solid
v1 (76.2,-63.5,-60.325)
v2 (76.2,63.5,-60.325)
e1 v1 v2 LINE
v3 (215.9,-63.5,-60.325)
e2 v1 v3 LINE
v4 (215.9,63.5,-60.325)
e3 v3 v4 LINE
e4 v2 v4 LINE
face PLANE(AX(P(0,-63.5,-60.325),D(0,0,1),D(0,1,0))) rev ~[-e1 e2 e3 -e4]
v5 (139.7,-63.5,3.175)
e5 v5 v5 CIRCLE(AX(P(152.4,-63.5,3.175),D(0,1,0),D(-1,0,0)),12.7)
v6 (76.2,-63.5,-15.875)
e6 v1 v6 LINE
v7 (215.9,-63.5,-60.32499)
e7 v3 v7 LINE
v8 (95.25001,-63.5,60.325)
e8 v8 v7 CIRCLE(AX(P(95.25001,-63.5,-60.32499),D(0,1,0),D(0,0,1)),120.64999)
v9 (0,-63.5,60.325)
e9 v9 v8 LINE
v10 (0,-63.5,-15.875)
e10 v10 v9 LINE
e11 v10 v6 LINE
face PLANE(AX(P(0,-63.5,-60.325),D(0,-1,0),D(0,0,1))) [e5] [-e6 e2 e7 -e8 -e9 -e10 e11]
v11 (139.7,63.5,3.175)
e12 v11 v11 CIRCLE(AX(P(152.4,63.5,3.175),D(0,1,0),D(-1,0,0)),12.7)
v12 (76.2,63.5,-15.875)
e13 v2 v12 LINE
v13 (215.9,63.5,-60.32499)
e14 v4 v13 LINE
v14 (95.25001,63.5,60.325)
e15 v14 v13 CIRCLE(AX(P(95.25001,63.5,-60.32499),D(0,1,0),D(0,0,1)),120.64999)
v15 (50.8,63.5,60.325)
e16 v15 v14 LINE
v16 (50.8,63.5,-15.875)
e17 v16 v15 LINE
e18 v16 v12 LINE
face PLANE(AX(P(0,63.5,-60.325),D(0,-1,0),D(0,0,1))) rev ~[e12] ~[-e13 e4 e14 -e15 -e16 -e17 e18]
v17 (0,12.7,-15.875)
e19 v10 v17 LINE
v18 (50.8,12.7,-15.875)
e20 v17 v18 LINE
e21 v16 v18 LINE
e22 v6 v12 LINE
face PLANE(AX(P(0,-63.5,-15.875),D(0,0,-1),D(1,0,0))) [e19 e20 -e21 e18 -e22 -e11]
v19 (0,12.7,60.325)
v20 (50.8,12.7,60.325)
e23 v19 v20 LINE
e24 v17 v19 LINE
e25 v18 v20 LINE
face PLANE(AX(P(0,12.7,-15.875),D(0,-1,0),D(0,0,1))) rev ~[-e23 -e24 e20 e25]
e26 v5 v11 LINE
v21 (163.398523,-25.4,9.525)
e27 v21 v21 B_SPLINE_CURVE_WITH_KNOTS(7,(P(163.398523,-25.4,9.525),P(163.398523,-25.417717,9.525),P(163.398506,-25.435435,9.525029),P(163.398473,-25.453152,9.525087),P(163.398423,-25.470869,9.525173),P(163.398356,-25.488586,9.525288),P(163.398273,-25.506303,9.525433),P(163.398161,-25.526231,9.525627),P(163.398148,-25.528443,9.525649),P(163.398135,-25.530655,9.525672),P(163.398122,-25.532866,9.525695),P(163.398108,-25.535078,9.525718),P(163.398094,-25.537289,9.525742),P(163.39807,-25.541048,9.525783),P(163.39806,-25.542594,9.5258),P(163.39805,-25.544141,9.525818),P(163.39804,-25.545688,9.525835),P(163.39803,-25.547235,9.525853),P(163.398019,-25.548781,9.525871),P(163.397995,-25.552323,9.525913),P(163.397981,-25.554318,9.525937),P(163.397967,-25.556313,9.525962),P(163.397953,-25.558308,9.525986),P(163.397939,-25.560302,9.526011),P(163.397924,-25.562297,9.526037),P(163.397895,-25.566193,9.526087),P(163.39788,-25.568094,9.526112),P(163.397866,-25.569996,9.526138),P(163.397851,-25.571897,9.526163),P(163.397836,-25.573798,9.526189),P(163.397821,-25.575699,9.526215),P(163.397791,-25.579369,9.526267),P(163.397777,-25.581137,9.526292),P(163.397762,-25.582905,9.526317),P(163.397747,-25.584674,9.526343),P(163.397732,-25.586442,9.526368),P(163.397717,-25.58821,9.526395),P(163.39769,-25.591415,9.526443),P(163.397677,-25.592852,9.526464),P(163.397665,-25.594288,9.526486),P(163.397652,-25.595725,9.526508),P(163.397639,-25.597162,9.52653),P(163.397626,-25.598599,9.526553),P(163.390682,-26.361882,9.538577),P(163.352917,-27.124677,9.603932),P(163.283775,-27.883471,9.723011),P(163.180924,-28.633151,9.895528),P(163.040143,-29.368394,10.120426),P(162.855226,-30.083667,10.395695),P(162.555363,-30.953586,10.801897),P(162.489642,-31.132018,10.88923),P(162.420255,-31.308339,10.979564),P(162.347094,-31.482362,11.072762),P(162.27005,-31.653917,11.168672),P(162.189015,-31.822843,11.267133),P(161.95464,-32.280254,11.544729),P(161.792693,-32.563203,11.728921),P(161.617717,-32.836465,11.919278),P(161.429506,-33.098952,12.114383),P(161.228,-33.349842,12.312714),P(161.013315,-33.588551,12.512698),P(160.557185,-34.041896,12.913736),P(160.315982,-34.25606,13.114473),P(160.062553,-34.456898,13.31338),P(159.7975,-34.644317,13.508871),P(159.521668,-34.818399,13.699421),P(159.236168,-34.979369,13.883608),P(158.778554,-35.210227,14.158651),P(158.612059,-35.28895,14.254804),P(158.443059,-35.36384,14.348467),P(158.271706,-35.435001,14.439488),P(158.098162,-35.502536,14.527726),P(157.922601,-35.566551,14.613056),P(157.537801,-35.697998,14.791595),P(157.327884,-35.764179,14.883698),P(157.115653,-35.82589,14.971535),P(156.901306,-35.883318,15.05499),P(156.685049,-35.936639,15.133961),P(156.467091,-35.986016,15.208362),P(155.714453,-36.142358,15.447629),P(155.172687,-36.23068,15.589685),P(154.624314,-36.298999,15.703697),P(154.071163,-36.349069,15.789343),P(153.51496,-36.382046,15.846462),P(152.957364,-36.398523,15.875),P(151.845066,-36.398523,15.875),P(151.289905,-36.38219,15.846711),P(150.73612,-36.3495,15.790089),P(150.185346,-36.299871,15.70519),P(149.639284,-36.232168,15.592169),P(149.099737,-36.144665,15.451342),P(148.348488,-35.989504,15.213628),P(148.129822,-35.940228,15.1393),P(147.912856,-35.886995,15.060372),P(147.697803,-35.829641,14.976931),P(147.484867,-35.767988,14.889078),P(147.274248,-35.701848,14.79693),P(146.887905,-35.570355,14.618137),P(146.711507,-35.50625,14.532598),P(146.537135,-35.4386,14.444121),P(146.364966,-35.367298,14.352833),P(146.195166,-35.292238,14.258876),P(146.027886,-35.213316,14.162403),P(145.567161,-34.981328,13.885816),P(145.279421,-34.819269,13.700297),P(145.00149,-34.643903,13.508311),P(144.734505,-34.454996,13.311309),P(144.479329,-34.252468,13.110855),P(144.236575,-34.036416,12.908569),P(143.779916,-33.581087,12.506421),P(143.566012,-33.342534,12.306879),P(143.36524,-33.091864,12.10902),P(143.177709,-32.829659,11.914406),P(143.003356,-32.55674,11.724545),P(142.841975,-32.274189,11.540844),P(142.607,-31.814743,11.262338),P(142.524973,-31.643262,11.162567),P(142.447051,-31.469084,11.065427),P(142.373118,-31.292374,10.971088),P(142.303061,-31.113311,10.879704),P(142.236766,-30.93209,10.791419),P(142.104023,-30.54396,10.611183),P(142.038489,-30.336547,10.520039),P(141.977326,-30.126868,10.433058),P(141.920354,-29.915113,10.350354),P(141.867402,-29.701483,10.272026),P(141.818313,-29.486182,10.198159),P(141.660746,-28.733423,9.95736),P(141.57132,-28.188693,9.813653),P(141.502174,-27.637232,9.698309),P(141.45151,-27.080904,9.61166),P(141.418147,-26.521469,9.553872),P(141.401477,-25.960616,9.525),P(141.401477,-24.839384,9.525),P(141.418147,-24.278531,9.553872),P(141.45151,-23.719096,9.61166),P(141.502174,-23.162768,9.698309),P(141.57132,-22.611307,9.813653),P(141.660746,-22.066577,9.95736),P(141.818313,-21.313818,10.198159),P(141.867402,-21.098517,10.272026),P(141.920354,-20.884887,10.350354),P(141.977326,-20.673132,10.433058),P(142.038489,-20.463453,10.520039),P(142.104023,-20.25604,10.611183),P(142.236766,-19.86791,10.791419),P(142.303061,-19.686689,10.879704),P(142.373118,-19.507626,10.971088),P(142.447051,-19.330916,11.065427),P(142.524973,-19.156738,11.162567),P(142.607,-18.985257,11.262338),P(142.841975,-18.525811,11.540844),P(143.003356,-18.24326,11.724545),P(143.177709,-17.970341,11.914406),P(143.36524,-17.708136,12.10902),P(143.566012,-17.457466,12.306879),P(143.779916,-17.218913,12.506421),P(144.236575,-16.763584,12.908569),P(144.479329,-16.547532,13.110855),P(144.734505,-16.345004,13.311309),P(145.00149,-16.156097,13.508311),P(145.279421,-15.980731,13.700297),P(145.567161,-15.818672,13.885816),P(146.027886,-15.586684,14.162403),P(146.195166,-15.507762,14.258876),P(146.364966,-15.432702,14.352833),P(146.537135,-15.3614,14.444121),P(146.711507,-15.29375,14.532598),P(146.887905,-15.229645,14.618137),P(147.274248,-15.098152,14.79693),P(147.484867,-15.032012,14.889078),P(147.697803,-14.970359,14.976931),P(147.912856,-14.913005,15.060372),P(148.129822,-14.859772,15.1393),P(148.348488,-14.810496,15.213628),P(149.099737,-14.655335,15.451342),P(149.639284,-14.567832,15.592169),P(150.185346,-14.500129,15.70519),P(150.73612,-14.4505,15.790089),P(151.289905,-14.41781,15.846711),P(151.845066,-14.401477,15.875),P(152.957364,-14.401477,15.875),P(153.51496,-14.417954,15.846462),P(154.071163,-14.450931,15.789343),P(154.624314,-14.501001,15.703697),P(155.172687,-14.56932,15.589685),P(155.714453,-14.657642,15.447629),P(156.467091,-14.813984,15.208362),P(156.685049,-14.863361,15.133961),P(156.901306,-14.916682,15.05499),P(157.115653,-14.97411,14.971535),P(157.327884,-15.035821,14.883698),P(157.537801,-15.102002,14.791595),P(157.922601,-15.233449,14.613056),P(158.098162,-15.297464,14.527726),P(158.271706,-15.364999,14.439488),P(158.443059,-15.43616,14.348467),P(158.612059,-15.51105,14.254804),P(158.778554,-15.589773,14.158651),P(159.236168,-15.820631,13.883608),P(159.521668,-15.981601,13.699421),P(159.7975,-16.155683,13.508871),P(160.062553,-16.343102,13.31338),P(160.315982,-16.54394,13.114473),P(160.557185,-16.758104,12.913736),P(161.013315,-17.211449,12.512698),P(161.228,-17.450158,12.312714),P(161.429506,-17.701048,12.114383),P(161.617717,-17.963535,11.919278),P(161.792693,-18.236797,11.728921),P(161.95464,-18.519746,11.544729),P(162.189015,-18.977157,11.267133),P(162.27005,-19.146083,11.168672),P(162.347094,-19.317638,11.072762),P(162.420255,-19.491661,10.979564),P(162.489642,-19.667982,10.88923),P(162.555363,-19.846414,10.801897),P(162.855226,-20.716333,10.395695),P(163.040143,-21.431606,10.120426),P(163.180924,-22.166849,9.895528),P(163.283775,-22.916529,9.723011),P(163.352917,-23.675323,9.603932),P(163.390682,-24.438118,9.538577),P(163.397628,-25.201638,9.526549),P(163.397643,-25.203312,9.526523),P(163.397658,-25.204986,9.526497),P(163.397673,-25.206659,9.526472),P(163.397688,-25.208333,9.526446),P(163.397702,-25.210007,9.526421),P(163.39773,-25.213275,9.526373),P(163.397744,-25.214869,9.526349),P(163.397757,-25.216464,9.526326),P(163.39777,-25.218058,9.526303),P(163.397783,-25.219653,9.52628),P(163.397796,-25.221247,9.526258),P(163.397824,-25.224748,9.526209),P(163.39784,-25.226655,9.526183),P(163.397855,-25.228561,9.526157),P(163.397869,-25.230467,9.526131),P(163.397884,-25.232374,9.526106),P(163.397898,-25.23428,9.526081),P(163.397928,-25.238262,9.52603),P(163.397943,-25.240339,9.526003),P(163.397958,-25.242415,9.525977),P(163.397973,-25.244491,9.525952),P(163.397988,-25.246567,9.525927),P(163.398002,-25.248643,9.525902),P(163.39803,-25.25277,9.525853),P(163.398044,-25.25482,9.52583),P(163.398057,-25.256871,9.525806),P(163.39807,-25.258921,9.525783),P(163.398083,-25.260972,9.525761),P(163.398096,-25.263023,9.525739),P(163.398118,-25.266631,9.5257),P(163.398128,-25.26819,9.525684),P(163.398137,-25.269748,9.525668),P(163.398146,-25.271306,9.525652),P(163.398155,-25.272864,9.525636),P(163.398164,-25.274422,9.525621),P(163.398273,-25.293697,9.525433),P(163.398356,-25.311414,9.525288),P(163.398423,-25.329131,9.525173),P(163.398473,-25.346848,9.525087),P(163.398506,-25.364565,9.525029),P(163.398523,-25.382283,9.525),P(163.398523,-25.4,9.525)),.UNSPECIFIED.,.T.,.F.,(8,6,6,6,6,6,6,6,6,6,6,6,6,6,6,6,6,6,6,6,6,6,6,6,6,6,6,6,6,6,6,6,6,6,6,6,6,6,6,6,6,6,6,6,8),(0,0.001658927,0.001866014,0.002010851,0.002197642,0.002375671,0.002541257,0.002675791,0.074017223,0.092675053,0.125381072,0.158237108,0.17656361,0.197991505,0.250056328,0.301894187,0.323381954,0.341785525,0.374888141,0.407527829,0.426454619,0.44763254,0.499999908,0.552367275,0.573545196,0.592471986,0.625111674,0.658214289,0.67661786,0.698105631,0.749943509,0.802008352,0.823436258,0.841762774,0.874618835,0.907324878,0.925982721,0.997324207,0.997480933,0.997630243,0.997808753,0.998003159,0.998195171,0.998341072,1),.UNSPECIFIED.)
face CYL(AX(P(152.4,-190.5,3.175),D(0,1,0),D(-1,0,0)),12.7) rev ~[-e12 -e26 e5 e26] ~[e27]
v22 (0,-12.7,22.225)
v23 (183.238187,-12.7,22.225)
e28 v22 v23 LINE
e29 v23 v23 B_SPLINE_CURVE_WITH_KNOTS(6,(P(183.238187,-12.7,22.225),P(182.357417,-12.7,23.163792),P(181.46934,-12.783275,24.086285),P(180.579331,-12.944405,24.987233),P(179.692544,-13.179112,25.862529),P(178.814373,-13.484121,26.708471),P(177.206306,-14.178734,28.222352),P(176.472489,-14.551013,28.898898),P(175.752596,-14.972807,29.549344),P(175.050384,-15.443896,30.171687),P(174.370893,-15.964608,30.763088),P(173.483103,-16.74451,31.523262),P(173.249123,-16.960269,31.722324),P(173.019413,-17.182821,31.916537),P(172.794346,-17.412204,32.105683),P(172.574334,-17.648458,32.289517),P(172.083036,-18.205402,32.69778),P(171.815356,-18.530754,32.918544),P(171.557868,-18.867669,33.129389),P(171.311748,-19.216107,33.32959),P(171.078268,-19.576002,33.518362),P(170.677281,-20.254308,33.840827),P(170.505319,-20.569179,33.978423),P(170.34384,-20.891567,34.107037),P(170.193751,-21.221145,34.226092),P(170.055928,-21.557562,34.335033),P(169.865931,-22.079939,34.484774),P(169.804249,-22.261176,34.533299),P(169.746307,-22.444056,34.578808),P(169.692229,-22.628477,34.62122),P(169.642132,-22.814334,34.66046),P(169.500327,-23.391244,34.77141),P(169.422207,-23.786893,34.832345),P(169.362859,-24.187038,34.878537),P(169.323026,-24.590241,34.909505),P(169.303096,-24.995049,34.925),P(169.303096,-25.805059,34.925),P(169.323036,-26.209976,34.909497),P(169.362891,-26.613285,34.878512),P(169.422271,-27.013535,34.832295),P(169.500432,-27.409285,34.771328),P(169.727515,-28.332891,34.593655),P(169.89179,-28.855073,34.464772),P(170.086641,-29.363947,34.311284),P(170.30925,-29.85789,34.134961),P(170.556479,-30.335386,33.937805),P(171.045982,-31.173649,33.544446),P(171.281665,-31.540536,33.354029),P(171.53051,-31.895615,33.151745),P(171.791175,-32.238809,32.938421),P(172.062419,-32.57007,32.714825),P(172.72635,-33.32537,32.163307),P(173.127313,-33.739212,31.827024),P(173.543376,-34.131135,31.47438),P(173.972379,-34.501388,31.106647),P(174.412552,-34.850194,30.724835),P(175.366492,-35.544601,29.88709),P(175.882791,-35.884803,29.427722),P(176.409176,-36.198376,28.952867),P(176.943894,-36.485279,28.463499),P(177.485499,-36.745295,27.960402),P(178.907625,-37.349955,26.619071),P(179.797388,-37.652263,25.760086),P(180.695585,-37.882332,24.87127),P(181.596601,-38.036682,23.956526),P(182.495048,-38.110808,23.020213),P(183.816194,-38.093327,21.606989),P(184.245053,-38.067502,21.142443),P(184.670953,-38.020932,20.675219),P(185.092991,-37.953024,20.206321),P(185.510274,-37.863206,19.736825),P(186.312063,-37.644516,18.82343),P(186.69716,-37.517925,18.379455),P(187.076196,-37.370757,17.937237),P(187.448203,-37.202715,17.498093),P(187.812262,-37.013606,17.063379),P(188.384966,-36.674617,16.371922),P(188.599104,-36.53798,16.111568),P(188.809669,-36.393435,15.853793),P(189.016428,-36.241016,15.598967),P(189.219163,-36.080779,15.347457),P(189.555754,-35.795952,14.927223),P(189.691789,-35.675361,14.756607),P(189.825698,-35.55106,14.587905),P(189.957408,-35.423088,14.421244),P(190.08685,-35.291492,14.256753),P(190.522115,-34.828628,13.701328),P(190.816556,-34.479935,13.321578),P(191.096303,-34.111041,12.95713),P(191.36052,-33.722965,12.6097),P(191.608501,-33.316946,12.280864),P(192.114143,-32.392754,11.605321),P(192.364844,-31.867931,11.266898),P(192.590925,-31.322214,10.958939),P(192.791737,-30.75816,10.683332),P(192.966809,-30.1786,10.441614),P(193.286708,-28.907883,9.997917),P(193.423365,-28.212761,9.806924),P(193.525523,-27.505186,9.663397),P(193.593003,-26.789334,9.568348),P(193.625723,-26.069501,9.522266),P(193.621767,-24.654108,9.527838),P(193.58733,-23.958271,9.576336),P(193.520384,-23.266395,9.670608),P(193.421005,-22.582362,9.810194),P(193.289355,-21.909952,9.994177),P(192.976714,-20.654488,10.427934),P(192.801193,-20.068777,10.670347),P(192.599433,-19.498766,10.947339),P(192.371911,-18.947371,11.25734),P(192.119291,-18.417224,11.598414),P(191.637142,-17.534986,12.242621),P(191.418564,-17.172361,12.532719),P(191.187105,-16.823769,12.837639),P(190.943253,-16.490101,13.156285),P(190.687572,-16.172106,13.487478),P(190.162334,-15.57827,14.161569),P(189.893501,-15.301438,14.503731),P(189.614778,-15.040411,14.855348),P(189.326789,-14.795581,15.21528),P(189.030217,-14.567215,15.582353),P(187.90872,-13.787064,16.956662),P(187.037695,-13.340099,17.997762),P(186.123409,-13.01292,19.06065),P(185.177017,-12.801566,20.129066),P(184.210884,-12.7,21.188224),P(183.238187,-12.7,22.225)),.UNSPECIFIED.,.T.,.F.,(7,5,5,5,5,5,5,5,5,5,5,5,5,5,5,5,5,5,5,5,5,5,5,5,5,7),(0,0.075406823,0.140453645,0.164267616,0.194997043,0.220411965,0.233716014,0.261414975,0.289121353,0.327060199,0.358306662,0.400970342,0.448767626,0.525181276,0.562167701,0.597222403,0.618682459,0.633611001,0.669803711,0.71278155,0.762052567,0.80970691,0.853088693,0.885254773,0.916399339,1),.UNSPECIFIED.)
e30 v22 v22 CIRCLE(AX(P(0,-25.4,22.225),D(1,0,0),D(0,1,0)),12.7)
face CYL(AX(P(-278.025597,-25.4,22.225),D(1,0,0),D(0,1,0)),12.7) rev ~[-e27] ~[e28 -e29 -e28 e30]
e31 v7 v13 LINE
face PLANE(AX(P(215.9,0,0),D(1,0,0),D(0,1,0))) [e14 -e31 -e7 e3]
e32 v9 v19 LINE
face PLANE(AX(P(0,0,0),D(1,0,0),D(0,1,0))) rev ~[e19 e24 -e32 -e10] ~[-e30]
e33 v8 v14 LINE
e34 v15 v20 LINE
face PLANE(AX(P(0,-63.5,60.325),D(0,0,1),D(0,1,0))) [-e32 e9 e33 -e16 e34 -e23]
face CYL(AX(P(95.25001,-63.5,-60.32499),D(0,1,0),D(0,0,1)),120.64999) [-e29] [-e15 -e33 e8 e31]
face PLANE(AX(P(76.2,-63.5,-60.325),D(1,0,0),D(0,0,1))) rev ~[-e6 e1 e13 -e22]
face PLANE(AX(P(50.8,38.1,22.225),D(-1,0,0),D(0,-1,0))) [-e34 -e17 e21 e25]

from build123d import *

# Parameters (mm, degrees)
F0_W      = 127
F0_H      = 120.65
F1_DEPTH  = 215.9
F2_W      = 76.2
F2_H      = 44.45
F3_DEPTH  = 127
F4_W      = 50.8
F4_H      = 76.2
F5_DEPTH  = 50.8
F8_D      = 25.4
F8_DEPTH  = 127
F8_TIP    = 7.6309298617
F9_R      = 120.64999
F10_DEPTH = 50.8
F13_D     = 25.4


# Not quite as in the source:
# - a fillet or chamfer is up to 0.001 mm smaller than in the source, because OpenCascade refuses the exact size
# - a feature of the source that left no trace in its solid (it failed there, or was rolled back) is left out


with BuildPart() as f1:
    # F0 (on Right) → F1 (new body)
    with BuildSketch(Plane.YZ):
        Rectangle(F0_W, F0_H)
    extrude(amount=F1_DEPTH)

    # F2 (on face) → F3 (cut)
    with BuildSketch(Plane.XZ.offset(63.5)):
        with Locations((38.1, -38.1)):
            Rectangle(F2_W, F2_H)
    extrude(amount=-F3_DEPTH, mode=Mode.SUBTRACT)

    # F4 (on face) → F5 (cut)
    with BuildSketch(Plane(origin=(0, 0, 0), x_dir=(0, -1, 0), z_dir=(-1, 0, 0))):
        with Locations((-38.1, 22.225)):
            Rectangle(F4_W, F4_H)
    extrude(amount=-F5_DEPTH, mode=Mode.SUBTRACT)

    # F8
    with Locations(Plane.XZ.offset(63.5)):
        with Locations((152.4, 3.175)):
            Hole(F8_D / 2, depth=F8_DEPTH)
            with Locations((0, 0, -(F8_DEPTH + F8_TIP / 2))):  # 118° drill point
                Cone(0, F8_D / 2, F8_TIP, mode=Mode.SUBTRACT)

    # F9 (radius 120.65 in the source; OpenCascade refuses exactly that, so slightly less here)
    f9_edges = [f1.edges().sort_by_distance(p)[0] for p in [
        (215.9, 0, 60.325),
    ]]
    fillet(f9_edges, radius=F9_R)

    # F4 (on face) → F10 (cut)
    with BuildSketch(Plane(origin=(0, 0, 0), x_dir=(0, -1, 0), z_dir=(-1, 0, 0))):
        with Locations((-38.1, 22.225)):
            Rectangle(F4_W, F4_H)
    extrude(amount=-F10_DEPTH, mode=Mode.SUBTRACT)

    # F13 (through all)
    with Locations(Plane(origin=(0, 0, 0), x_dir=(0, -1, 0), z_dir=(-1, 0, 0))):
        with Locations((25.4, 22.225)):
            Hole(F13_D / 2)


solid = f1.part
